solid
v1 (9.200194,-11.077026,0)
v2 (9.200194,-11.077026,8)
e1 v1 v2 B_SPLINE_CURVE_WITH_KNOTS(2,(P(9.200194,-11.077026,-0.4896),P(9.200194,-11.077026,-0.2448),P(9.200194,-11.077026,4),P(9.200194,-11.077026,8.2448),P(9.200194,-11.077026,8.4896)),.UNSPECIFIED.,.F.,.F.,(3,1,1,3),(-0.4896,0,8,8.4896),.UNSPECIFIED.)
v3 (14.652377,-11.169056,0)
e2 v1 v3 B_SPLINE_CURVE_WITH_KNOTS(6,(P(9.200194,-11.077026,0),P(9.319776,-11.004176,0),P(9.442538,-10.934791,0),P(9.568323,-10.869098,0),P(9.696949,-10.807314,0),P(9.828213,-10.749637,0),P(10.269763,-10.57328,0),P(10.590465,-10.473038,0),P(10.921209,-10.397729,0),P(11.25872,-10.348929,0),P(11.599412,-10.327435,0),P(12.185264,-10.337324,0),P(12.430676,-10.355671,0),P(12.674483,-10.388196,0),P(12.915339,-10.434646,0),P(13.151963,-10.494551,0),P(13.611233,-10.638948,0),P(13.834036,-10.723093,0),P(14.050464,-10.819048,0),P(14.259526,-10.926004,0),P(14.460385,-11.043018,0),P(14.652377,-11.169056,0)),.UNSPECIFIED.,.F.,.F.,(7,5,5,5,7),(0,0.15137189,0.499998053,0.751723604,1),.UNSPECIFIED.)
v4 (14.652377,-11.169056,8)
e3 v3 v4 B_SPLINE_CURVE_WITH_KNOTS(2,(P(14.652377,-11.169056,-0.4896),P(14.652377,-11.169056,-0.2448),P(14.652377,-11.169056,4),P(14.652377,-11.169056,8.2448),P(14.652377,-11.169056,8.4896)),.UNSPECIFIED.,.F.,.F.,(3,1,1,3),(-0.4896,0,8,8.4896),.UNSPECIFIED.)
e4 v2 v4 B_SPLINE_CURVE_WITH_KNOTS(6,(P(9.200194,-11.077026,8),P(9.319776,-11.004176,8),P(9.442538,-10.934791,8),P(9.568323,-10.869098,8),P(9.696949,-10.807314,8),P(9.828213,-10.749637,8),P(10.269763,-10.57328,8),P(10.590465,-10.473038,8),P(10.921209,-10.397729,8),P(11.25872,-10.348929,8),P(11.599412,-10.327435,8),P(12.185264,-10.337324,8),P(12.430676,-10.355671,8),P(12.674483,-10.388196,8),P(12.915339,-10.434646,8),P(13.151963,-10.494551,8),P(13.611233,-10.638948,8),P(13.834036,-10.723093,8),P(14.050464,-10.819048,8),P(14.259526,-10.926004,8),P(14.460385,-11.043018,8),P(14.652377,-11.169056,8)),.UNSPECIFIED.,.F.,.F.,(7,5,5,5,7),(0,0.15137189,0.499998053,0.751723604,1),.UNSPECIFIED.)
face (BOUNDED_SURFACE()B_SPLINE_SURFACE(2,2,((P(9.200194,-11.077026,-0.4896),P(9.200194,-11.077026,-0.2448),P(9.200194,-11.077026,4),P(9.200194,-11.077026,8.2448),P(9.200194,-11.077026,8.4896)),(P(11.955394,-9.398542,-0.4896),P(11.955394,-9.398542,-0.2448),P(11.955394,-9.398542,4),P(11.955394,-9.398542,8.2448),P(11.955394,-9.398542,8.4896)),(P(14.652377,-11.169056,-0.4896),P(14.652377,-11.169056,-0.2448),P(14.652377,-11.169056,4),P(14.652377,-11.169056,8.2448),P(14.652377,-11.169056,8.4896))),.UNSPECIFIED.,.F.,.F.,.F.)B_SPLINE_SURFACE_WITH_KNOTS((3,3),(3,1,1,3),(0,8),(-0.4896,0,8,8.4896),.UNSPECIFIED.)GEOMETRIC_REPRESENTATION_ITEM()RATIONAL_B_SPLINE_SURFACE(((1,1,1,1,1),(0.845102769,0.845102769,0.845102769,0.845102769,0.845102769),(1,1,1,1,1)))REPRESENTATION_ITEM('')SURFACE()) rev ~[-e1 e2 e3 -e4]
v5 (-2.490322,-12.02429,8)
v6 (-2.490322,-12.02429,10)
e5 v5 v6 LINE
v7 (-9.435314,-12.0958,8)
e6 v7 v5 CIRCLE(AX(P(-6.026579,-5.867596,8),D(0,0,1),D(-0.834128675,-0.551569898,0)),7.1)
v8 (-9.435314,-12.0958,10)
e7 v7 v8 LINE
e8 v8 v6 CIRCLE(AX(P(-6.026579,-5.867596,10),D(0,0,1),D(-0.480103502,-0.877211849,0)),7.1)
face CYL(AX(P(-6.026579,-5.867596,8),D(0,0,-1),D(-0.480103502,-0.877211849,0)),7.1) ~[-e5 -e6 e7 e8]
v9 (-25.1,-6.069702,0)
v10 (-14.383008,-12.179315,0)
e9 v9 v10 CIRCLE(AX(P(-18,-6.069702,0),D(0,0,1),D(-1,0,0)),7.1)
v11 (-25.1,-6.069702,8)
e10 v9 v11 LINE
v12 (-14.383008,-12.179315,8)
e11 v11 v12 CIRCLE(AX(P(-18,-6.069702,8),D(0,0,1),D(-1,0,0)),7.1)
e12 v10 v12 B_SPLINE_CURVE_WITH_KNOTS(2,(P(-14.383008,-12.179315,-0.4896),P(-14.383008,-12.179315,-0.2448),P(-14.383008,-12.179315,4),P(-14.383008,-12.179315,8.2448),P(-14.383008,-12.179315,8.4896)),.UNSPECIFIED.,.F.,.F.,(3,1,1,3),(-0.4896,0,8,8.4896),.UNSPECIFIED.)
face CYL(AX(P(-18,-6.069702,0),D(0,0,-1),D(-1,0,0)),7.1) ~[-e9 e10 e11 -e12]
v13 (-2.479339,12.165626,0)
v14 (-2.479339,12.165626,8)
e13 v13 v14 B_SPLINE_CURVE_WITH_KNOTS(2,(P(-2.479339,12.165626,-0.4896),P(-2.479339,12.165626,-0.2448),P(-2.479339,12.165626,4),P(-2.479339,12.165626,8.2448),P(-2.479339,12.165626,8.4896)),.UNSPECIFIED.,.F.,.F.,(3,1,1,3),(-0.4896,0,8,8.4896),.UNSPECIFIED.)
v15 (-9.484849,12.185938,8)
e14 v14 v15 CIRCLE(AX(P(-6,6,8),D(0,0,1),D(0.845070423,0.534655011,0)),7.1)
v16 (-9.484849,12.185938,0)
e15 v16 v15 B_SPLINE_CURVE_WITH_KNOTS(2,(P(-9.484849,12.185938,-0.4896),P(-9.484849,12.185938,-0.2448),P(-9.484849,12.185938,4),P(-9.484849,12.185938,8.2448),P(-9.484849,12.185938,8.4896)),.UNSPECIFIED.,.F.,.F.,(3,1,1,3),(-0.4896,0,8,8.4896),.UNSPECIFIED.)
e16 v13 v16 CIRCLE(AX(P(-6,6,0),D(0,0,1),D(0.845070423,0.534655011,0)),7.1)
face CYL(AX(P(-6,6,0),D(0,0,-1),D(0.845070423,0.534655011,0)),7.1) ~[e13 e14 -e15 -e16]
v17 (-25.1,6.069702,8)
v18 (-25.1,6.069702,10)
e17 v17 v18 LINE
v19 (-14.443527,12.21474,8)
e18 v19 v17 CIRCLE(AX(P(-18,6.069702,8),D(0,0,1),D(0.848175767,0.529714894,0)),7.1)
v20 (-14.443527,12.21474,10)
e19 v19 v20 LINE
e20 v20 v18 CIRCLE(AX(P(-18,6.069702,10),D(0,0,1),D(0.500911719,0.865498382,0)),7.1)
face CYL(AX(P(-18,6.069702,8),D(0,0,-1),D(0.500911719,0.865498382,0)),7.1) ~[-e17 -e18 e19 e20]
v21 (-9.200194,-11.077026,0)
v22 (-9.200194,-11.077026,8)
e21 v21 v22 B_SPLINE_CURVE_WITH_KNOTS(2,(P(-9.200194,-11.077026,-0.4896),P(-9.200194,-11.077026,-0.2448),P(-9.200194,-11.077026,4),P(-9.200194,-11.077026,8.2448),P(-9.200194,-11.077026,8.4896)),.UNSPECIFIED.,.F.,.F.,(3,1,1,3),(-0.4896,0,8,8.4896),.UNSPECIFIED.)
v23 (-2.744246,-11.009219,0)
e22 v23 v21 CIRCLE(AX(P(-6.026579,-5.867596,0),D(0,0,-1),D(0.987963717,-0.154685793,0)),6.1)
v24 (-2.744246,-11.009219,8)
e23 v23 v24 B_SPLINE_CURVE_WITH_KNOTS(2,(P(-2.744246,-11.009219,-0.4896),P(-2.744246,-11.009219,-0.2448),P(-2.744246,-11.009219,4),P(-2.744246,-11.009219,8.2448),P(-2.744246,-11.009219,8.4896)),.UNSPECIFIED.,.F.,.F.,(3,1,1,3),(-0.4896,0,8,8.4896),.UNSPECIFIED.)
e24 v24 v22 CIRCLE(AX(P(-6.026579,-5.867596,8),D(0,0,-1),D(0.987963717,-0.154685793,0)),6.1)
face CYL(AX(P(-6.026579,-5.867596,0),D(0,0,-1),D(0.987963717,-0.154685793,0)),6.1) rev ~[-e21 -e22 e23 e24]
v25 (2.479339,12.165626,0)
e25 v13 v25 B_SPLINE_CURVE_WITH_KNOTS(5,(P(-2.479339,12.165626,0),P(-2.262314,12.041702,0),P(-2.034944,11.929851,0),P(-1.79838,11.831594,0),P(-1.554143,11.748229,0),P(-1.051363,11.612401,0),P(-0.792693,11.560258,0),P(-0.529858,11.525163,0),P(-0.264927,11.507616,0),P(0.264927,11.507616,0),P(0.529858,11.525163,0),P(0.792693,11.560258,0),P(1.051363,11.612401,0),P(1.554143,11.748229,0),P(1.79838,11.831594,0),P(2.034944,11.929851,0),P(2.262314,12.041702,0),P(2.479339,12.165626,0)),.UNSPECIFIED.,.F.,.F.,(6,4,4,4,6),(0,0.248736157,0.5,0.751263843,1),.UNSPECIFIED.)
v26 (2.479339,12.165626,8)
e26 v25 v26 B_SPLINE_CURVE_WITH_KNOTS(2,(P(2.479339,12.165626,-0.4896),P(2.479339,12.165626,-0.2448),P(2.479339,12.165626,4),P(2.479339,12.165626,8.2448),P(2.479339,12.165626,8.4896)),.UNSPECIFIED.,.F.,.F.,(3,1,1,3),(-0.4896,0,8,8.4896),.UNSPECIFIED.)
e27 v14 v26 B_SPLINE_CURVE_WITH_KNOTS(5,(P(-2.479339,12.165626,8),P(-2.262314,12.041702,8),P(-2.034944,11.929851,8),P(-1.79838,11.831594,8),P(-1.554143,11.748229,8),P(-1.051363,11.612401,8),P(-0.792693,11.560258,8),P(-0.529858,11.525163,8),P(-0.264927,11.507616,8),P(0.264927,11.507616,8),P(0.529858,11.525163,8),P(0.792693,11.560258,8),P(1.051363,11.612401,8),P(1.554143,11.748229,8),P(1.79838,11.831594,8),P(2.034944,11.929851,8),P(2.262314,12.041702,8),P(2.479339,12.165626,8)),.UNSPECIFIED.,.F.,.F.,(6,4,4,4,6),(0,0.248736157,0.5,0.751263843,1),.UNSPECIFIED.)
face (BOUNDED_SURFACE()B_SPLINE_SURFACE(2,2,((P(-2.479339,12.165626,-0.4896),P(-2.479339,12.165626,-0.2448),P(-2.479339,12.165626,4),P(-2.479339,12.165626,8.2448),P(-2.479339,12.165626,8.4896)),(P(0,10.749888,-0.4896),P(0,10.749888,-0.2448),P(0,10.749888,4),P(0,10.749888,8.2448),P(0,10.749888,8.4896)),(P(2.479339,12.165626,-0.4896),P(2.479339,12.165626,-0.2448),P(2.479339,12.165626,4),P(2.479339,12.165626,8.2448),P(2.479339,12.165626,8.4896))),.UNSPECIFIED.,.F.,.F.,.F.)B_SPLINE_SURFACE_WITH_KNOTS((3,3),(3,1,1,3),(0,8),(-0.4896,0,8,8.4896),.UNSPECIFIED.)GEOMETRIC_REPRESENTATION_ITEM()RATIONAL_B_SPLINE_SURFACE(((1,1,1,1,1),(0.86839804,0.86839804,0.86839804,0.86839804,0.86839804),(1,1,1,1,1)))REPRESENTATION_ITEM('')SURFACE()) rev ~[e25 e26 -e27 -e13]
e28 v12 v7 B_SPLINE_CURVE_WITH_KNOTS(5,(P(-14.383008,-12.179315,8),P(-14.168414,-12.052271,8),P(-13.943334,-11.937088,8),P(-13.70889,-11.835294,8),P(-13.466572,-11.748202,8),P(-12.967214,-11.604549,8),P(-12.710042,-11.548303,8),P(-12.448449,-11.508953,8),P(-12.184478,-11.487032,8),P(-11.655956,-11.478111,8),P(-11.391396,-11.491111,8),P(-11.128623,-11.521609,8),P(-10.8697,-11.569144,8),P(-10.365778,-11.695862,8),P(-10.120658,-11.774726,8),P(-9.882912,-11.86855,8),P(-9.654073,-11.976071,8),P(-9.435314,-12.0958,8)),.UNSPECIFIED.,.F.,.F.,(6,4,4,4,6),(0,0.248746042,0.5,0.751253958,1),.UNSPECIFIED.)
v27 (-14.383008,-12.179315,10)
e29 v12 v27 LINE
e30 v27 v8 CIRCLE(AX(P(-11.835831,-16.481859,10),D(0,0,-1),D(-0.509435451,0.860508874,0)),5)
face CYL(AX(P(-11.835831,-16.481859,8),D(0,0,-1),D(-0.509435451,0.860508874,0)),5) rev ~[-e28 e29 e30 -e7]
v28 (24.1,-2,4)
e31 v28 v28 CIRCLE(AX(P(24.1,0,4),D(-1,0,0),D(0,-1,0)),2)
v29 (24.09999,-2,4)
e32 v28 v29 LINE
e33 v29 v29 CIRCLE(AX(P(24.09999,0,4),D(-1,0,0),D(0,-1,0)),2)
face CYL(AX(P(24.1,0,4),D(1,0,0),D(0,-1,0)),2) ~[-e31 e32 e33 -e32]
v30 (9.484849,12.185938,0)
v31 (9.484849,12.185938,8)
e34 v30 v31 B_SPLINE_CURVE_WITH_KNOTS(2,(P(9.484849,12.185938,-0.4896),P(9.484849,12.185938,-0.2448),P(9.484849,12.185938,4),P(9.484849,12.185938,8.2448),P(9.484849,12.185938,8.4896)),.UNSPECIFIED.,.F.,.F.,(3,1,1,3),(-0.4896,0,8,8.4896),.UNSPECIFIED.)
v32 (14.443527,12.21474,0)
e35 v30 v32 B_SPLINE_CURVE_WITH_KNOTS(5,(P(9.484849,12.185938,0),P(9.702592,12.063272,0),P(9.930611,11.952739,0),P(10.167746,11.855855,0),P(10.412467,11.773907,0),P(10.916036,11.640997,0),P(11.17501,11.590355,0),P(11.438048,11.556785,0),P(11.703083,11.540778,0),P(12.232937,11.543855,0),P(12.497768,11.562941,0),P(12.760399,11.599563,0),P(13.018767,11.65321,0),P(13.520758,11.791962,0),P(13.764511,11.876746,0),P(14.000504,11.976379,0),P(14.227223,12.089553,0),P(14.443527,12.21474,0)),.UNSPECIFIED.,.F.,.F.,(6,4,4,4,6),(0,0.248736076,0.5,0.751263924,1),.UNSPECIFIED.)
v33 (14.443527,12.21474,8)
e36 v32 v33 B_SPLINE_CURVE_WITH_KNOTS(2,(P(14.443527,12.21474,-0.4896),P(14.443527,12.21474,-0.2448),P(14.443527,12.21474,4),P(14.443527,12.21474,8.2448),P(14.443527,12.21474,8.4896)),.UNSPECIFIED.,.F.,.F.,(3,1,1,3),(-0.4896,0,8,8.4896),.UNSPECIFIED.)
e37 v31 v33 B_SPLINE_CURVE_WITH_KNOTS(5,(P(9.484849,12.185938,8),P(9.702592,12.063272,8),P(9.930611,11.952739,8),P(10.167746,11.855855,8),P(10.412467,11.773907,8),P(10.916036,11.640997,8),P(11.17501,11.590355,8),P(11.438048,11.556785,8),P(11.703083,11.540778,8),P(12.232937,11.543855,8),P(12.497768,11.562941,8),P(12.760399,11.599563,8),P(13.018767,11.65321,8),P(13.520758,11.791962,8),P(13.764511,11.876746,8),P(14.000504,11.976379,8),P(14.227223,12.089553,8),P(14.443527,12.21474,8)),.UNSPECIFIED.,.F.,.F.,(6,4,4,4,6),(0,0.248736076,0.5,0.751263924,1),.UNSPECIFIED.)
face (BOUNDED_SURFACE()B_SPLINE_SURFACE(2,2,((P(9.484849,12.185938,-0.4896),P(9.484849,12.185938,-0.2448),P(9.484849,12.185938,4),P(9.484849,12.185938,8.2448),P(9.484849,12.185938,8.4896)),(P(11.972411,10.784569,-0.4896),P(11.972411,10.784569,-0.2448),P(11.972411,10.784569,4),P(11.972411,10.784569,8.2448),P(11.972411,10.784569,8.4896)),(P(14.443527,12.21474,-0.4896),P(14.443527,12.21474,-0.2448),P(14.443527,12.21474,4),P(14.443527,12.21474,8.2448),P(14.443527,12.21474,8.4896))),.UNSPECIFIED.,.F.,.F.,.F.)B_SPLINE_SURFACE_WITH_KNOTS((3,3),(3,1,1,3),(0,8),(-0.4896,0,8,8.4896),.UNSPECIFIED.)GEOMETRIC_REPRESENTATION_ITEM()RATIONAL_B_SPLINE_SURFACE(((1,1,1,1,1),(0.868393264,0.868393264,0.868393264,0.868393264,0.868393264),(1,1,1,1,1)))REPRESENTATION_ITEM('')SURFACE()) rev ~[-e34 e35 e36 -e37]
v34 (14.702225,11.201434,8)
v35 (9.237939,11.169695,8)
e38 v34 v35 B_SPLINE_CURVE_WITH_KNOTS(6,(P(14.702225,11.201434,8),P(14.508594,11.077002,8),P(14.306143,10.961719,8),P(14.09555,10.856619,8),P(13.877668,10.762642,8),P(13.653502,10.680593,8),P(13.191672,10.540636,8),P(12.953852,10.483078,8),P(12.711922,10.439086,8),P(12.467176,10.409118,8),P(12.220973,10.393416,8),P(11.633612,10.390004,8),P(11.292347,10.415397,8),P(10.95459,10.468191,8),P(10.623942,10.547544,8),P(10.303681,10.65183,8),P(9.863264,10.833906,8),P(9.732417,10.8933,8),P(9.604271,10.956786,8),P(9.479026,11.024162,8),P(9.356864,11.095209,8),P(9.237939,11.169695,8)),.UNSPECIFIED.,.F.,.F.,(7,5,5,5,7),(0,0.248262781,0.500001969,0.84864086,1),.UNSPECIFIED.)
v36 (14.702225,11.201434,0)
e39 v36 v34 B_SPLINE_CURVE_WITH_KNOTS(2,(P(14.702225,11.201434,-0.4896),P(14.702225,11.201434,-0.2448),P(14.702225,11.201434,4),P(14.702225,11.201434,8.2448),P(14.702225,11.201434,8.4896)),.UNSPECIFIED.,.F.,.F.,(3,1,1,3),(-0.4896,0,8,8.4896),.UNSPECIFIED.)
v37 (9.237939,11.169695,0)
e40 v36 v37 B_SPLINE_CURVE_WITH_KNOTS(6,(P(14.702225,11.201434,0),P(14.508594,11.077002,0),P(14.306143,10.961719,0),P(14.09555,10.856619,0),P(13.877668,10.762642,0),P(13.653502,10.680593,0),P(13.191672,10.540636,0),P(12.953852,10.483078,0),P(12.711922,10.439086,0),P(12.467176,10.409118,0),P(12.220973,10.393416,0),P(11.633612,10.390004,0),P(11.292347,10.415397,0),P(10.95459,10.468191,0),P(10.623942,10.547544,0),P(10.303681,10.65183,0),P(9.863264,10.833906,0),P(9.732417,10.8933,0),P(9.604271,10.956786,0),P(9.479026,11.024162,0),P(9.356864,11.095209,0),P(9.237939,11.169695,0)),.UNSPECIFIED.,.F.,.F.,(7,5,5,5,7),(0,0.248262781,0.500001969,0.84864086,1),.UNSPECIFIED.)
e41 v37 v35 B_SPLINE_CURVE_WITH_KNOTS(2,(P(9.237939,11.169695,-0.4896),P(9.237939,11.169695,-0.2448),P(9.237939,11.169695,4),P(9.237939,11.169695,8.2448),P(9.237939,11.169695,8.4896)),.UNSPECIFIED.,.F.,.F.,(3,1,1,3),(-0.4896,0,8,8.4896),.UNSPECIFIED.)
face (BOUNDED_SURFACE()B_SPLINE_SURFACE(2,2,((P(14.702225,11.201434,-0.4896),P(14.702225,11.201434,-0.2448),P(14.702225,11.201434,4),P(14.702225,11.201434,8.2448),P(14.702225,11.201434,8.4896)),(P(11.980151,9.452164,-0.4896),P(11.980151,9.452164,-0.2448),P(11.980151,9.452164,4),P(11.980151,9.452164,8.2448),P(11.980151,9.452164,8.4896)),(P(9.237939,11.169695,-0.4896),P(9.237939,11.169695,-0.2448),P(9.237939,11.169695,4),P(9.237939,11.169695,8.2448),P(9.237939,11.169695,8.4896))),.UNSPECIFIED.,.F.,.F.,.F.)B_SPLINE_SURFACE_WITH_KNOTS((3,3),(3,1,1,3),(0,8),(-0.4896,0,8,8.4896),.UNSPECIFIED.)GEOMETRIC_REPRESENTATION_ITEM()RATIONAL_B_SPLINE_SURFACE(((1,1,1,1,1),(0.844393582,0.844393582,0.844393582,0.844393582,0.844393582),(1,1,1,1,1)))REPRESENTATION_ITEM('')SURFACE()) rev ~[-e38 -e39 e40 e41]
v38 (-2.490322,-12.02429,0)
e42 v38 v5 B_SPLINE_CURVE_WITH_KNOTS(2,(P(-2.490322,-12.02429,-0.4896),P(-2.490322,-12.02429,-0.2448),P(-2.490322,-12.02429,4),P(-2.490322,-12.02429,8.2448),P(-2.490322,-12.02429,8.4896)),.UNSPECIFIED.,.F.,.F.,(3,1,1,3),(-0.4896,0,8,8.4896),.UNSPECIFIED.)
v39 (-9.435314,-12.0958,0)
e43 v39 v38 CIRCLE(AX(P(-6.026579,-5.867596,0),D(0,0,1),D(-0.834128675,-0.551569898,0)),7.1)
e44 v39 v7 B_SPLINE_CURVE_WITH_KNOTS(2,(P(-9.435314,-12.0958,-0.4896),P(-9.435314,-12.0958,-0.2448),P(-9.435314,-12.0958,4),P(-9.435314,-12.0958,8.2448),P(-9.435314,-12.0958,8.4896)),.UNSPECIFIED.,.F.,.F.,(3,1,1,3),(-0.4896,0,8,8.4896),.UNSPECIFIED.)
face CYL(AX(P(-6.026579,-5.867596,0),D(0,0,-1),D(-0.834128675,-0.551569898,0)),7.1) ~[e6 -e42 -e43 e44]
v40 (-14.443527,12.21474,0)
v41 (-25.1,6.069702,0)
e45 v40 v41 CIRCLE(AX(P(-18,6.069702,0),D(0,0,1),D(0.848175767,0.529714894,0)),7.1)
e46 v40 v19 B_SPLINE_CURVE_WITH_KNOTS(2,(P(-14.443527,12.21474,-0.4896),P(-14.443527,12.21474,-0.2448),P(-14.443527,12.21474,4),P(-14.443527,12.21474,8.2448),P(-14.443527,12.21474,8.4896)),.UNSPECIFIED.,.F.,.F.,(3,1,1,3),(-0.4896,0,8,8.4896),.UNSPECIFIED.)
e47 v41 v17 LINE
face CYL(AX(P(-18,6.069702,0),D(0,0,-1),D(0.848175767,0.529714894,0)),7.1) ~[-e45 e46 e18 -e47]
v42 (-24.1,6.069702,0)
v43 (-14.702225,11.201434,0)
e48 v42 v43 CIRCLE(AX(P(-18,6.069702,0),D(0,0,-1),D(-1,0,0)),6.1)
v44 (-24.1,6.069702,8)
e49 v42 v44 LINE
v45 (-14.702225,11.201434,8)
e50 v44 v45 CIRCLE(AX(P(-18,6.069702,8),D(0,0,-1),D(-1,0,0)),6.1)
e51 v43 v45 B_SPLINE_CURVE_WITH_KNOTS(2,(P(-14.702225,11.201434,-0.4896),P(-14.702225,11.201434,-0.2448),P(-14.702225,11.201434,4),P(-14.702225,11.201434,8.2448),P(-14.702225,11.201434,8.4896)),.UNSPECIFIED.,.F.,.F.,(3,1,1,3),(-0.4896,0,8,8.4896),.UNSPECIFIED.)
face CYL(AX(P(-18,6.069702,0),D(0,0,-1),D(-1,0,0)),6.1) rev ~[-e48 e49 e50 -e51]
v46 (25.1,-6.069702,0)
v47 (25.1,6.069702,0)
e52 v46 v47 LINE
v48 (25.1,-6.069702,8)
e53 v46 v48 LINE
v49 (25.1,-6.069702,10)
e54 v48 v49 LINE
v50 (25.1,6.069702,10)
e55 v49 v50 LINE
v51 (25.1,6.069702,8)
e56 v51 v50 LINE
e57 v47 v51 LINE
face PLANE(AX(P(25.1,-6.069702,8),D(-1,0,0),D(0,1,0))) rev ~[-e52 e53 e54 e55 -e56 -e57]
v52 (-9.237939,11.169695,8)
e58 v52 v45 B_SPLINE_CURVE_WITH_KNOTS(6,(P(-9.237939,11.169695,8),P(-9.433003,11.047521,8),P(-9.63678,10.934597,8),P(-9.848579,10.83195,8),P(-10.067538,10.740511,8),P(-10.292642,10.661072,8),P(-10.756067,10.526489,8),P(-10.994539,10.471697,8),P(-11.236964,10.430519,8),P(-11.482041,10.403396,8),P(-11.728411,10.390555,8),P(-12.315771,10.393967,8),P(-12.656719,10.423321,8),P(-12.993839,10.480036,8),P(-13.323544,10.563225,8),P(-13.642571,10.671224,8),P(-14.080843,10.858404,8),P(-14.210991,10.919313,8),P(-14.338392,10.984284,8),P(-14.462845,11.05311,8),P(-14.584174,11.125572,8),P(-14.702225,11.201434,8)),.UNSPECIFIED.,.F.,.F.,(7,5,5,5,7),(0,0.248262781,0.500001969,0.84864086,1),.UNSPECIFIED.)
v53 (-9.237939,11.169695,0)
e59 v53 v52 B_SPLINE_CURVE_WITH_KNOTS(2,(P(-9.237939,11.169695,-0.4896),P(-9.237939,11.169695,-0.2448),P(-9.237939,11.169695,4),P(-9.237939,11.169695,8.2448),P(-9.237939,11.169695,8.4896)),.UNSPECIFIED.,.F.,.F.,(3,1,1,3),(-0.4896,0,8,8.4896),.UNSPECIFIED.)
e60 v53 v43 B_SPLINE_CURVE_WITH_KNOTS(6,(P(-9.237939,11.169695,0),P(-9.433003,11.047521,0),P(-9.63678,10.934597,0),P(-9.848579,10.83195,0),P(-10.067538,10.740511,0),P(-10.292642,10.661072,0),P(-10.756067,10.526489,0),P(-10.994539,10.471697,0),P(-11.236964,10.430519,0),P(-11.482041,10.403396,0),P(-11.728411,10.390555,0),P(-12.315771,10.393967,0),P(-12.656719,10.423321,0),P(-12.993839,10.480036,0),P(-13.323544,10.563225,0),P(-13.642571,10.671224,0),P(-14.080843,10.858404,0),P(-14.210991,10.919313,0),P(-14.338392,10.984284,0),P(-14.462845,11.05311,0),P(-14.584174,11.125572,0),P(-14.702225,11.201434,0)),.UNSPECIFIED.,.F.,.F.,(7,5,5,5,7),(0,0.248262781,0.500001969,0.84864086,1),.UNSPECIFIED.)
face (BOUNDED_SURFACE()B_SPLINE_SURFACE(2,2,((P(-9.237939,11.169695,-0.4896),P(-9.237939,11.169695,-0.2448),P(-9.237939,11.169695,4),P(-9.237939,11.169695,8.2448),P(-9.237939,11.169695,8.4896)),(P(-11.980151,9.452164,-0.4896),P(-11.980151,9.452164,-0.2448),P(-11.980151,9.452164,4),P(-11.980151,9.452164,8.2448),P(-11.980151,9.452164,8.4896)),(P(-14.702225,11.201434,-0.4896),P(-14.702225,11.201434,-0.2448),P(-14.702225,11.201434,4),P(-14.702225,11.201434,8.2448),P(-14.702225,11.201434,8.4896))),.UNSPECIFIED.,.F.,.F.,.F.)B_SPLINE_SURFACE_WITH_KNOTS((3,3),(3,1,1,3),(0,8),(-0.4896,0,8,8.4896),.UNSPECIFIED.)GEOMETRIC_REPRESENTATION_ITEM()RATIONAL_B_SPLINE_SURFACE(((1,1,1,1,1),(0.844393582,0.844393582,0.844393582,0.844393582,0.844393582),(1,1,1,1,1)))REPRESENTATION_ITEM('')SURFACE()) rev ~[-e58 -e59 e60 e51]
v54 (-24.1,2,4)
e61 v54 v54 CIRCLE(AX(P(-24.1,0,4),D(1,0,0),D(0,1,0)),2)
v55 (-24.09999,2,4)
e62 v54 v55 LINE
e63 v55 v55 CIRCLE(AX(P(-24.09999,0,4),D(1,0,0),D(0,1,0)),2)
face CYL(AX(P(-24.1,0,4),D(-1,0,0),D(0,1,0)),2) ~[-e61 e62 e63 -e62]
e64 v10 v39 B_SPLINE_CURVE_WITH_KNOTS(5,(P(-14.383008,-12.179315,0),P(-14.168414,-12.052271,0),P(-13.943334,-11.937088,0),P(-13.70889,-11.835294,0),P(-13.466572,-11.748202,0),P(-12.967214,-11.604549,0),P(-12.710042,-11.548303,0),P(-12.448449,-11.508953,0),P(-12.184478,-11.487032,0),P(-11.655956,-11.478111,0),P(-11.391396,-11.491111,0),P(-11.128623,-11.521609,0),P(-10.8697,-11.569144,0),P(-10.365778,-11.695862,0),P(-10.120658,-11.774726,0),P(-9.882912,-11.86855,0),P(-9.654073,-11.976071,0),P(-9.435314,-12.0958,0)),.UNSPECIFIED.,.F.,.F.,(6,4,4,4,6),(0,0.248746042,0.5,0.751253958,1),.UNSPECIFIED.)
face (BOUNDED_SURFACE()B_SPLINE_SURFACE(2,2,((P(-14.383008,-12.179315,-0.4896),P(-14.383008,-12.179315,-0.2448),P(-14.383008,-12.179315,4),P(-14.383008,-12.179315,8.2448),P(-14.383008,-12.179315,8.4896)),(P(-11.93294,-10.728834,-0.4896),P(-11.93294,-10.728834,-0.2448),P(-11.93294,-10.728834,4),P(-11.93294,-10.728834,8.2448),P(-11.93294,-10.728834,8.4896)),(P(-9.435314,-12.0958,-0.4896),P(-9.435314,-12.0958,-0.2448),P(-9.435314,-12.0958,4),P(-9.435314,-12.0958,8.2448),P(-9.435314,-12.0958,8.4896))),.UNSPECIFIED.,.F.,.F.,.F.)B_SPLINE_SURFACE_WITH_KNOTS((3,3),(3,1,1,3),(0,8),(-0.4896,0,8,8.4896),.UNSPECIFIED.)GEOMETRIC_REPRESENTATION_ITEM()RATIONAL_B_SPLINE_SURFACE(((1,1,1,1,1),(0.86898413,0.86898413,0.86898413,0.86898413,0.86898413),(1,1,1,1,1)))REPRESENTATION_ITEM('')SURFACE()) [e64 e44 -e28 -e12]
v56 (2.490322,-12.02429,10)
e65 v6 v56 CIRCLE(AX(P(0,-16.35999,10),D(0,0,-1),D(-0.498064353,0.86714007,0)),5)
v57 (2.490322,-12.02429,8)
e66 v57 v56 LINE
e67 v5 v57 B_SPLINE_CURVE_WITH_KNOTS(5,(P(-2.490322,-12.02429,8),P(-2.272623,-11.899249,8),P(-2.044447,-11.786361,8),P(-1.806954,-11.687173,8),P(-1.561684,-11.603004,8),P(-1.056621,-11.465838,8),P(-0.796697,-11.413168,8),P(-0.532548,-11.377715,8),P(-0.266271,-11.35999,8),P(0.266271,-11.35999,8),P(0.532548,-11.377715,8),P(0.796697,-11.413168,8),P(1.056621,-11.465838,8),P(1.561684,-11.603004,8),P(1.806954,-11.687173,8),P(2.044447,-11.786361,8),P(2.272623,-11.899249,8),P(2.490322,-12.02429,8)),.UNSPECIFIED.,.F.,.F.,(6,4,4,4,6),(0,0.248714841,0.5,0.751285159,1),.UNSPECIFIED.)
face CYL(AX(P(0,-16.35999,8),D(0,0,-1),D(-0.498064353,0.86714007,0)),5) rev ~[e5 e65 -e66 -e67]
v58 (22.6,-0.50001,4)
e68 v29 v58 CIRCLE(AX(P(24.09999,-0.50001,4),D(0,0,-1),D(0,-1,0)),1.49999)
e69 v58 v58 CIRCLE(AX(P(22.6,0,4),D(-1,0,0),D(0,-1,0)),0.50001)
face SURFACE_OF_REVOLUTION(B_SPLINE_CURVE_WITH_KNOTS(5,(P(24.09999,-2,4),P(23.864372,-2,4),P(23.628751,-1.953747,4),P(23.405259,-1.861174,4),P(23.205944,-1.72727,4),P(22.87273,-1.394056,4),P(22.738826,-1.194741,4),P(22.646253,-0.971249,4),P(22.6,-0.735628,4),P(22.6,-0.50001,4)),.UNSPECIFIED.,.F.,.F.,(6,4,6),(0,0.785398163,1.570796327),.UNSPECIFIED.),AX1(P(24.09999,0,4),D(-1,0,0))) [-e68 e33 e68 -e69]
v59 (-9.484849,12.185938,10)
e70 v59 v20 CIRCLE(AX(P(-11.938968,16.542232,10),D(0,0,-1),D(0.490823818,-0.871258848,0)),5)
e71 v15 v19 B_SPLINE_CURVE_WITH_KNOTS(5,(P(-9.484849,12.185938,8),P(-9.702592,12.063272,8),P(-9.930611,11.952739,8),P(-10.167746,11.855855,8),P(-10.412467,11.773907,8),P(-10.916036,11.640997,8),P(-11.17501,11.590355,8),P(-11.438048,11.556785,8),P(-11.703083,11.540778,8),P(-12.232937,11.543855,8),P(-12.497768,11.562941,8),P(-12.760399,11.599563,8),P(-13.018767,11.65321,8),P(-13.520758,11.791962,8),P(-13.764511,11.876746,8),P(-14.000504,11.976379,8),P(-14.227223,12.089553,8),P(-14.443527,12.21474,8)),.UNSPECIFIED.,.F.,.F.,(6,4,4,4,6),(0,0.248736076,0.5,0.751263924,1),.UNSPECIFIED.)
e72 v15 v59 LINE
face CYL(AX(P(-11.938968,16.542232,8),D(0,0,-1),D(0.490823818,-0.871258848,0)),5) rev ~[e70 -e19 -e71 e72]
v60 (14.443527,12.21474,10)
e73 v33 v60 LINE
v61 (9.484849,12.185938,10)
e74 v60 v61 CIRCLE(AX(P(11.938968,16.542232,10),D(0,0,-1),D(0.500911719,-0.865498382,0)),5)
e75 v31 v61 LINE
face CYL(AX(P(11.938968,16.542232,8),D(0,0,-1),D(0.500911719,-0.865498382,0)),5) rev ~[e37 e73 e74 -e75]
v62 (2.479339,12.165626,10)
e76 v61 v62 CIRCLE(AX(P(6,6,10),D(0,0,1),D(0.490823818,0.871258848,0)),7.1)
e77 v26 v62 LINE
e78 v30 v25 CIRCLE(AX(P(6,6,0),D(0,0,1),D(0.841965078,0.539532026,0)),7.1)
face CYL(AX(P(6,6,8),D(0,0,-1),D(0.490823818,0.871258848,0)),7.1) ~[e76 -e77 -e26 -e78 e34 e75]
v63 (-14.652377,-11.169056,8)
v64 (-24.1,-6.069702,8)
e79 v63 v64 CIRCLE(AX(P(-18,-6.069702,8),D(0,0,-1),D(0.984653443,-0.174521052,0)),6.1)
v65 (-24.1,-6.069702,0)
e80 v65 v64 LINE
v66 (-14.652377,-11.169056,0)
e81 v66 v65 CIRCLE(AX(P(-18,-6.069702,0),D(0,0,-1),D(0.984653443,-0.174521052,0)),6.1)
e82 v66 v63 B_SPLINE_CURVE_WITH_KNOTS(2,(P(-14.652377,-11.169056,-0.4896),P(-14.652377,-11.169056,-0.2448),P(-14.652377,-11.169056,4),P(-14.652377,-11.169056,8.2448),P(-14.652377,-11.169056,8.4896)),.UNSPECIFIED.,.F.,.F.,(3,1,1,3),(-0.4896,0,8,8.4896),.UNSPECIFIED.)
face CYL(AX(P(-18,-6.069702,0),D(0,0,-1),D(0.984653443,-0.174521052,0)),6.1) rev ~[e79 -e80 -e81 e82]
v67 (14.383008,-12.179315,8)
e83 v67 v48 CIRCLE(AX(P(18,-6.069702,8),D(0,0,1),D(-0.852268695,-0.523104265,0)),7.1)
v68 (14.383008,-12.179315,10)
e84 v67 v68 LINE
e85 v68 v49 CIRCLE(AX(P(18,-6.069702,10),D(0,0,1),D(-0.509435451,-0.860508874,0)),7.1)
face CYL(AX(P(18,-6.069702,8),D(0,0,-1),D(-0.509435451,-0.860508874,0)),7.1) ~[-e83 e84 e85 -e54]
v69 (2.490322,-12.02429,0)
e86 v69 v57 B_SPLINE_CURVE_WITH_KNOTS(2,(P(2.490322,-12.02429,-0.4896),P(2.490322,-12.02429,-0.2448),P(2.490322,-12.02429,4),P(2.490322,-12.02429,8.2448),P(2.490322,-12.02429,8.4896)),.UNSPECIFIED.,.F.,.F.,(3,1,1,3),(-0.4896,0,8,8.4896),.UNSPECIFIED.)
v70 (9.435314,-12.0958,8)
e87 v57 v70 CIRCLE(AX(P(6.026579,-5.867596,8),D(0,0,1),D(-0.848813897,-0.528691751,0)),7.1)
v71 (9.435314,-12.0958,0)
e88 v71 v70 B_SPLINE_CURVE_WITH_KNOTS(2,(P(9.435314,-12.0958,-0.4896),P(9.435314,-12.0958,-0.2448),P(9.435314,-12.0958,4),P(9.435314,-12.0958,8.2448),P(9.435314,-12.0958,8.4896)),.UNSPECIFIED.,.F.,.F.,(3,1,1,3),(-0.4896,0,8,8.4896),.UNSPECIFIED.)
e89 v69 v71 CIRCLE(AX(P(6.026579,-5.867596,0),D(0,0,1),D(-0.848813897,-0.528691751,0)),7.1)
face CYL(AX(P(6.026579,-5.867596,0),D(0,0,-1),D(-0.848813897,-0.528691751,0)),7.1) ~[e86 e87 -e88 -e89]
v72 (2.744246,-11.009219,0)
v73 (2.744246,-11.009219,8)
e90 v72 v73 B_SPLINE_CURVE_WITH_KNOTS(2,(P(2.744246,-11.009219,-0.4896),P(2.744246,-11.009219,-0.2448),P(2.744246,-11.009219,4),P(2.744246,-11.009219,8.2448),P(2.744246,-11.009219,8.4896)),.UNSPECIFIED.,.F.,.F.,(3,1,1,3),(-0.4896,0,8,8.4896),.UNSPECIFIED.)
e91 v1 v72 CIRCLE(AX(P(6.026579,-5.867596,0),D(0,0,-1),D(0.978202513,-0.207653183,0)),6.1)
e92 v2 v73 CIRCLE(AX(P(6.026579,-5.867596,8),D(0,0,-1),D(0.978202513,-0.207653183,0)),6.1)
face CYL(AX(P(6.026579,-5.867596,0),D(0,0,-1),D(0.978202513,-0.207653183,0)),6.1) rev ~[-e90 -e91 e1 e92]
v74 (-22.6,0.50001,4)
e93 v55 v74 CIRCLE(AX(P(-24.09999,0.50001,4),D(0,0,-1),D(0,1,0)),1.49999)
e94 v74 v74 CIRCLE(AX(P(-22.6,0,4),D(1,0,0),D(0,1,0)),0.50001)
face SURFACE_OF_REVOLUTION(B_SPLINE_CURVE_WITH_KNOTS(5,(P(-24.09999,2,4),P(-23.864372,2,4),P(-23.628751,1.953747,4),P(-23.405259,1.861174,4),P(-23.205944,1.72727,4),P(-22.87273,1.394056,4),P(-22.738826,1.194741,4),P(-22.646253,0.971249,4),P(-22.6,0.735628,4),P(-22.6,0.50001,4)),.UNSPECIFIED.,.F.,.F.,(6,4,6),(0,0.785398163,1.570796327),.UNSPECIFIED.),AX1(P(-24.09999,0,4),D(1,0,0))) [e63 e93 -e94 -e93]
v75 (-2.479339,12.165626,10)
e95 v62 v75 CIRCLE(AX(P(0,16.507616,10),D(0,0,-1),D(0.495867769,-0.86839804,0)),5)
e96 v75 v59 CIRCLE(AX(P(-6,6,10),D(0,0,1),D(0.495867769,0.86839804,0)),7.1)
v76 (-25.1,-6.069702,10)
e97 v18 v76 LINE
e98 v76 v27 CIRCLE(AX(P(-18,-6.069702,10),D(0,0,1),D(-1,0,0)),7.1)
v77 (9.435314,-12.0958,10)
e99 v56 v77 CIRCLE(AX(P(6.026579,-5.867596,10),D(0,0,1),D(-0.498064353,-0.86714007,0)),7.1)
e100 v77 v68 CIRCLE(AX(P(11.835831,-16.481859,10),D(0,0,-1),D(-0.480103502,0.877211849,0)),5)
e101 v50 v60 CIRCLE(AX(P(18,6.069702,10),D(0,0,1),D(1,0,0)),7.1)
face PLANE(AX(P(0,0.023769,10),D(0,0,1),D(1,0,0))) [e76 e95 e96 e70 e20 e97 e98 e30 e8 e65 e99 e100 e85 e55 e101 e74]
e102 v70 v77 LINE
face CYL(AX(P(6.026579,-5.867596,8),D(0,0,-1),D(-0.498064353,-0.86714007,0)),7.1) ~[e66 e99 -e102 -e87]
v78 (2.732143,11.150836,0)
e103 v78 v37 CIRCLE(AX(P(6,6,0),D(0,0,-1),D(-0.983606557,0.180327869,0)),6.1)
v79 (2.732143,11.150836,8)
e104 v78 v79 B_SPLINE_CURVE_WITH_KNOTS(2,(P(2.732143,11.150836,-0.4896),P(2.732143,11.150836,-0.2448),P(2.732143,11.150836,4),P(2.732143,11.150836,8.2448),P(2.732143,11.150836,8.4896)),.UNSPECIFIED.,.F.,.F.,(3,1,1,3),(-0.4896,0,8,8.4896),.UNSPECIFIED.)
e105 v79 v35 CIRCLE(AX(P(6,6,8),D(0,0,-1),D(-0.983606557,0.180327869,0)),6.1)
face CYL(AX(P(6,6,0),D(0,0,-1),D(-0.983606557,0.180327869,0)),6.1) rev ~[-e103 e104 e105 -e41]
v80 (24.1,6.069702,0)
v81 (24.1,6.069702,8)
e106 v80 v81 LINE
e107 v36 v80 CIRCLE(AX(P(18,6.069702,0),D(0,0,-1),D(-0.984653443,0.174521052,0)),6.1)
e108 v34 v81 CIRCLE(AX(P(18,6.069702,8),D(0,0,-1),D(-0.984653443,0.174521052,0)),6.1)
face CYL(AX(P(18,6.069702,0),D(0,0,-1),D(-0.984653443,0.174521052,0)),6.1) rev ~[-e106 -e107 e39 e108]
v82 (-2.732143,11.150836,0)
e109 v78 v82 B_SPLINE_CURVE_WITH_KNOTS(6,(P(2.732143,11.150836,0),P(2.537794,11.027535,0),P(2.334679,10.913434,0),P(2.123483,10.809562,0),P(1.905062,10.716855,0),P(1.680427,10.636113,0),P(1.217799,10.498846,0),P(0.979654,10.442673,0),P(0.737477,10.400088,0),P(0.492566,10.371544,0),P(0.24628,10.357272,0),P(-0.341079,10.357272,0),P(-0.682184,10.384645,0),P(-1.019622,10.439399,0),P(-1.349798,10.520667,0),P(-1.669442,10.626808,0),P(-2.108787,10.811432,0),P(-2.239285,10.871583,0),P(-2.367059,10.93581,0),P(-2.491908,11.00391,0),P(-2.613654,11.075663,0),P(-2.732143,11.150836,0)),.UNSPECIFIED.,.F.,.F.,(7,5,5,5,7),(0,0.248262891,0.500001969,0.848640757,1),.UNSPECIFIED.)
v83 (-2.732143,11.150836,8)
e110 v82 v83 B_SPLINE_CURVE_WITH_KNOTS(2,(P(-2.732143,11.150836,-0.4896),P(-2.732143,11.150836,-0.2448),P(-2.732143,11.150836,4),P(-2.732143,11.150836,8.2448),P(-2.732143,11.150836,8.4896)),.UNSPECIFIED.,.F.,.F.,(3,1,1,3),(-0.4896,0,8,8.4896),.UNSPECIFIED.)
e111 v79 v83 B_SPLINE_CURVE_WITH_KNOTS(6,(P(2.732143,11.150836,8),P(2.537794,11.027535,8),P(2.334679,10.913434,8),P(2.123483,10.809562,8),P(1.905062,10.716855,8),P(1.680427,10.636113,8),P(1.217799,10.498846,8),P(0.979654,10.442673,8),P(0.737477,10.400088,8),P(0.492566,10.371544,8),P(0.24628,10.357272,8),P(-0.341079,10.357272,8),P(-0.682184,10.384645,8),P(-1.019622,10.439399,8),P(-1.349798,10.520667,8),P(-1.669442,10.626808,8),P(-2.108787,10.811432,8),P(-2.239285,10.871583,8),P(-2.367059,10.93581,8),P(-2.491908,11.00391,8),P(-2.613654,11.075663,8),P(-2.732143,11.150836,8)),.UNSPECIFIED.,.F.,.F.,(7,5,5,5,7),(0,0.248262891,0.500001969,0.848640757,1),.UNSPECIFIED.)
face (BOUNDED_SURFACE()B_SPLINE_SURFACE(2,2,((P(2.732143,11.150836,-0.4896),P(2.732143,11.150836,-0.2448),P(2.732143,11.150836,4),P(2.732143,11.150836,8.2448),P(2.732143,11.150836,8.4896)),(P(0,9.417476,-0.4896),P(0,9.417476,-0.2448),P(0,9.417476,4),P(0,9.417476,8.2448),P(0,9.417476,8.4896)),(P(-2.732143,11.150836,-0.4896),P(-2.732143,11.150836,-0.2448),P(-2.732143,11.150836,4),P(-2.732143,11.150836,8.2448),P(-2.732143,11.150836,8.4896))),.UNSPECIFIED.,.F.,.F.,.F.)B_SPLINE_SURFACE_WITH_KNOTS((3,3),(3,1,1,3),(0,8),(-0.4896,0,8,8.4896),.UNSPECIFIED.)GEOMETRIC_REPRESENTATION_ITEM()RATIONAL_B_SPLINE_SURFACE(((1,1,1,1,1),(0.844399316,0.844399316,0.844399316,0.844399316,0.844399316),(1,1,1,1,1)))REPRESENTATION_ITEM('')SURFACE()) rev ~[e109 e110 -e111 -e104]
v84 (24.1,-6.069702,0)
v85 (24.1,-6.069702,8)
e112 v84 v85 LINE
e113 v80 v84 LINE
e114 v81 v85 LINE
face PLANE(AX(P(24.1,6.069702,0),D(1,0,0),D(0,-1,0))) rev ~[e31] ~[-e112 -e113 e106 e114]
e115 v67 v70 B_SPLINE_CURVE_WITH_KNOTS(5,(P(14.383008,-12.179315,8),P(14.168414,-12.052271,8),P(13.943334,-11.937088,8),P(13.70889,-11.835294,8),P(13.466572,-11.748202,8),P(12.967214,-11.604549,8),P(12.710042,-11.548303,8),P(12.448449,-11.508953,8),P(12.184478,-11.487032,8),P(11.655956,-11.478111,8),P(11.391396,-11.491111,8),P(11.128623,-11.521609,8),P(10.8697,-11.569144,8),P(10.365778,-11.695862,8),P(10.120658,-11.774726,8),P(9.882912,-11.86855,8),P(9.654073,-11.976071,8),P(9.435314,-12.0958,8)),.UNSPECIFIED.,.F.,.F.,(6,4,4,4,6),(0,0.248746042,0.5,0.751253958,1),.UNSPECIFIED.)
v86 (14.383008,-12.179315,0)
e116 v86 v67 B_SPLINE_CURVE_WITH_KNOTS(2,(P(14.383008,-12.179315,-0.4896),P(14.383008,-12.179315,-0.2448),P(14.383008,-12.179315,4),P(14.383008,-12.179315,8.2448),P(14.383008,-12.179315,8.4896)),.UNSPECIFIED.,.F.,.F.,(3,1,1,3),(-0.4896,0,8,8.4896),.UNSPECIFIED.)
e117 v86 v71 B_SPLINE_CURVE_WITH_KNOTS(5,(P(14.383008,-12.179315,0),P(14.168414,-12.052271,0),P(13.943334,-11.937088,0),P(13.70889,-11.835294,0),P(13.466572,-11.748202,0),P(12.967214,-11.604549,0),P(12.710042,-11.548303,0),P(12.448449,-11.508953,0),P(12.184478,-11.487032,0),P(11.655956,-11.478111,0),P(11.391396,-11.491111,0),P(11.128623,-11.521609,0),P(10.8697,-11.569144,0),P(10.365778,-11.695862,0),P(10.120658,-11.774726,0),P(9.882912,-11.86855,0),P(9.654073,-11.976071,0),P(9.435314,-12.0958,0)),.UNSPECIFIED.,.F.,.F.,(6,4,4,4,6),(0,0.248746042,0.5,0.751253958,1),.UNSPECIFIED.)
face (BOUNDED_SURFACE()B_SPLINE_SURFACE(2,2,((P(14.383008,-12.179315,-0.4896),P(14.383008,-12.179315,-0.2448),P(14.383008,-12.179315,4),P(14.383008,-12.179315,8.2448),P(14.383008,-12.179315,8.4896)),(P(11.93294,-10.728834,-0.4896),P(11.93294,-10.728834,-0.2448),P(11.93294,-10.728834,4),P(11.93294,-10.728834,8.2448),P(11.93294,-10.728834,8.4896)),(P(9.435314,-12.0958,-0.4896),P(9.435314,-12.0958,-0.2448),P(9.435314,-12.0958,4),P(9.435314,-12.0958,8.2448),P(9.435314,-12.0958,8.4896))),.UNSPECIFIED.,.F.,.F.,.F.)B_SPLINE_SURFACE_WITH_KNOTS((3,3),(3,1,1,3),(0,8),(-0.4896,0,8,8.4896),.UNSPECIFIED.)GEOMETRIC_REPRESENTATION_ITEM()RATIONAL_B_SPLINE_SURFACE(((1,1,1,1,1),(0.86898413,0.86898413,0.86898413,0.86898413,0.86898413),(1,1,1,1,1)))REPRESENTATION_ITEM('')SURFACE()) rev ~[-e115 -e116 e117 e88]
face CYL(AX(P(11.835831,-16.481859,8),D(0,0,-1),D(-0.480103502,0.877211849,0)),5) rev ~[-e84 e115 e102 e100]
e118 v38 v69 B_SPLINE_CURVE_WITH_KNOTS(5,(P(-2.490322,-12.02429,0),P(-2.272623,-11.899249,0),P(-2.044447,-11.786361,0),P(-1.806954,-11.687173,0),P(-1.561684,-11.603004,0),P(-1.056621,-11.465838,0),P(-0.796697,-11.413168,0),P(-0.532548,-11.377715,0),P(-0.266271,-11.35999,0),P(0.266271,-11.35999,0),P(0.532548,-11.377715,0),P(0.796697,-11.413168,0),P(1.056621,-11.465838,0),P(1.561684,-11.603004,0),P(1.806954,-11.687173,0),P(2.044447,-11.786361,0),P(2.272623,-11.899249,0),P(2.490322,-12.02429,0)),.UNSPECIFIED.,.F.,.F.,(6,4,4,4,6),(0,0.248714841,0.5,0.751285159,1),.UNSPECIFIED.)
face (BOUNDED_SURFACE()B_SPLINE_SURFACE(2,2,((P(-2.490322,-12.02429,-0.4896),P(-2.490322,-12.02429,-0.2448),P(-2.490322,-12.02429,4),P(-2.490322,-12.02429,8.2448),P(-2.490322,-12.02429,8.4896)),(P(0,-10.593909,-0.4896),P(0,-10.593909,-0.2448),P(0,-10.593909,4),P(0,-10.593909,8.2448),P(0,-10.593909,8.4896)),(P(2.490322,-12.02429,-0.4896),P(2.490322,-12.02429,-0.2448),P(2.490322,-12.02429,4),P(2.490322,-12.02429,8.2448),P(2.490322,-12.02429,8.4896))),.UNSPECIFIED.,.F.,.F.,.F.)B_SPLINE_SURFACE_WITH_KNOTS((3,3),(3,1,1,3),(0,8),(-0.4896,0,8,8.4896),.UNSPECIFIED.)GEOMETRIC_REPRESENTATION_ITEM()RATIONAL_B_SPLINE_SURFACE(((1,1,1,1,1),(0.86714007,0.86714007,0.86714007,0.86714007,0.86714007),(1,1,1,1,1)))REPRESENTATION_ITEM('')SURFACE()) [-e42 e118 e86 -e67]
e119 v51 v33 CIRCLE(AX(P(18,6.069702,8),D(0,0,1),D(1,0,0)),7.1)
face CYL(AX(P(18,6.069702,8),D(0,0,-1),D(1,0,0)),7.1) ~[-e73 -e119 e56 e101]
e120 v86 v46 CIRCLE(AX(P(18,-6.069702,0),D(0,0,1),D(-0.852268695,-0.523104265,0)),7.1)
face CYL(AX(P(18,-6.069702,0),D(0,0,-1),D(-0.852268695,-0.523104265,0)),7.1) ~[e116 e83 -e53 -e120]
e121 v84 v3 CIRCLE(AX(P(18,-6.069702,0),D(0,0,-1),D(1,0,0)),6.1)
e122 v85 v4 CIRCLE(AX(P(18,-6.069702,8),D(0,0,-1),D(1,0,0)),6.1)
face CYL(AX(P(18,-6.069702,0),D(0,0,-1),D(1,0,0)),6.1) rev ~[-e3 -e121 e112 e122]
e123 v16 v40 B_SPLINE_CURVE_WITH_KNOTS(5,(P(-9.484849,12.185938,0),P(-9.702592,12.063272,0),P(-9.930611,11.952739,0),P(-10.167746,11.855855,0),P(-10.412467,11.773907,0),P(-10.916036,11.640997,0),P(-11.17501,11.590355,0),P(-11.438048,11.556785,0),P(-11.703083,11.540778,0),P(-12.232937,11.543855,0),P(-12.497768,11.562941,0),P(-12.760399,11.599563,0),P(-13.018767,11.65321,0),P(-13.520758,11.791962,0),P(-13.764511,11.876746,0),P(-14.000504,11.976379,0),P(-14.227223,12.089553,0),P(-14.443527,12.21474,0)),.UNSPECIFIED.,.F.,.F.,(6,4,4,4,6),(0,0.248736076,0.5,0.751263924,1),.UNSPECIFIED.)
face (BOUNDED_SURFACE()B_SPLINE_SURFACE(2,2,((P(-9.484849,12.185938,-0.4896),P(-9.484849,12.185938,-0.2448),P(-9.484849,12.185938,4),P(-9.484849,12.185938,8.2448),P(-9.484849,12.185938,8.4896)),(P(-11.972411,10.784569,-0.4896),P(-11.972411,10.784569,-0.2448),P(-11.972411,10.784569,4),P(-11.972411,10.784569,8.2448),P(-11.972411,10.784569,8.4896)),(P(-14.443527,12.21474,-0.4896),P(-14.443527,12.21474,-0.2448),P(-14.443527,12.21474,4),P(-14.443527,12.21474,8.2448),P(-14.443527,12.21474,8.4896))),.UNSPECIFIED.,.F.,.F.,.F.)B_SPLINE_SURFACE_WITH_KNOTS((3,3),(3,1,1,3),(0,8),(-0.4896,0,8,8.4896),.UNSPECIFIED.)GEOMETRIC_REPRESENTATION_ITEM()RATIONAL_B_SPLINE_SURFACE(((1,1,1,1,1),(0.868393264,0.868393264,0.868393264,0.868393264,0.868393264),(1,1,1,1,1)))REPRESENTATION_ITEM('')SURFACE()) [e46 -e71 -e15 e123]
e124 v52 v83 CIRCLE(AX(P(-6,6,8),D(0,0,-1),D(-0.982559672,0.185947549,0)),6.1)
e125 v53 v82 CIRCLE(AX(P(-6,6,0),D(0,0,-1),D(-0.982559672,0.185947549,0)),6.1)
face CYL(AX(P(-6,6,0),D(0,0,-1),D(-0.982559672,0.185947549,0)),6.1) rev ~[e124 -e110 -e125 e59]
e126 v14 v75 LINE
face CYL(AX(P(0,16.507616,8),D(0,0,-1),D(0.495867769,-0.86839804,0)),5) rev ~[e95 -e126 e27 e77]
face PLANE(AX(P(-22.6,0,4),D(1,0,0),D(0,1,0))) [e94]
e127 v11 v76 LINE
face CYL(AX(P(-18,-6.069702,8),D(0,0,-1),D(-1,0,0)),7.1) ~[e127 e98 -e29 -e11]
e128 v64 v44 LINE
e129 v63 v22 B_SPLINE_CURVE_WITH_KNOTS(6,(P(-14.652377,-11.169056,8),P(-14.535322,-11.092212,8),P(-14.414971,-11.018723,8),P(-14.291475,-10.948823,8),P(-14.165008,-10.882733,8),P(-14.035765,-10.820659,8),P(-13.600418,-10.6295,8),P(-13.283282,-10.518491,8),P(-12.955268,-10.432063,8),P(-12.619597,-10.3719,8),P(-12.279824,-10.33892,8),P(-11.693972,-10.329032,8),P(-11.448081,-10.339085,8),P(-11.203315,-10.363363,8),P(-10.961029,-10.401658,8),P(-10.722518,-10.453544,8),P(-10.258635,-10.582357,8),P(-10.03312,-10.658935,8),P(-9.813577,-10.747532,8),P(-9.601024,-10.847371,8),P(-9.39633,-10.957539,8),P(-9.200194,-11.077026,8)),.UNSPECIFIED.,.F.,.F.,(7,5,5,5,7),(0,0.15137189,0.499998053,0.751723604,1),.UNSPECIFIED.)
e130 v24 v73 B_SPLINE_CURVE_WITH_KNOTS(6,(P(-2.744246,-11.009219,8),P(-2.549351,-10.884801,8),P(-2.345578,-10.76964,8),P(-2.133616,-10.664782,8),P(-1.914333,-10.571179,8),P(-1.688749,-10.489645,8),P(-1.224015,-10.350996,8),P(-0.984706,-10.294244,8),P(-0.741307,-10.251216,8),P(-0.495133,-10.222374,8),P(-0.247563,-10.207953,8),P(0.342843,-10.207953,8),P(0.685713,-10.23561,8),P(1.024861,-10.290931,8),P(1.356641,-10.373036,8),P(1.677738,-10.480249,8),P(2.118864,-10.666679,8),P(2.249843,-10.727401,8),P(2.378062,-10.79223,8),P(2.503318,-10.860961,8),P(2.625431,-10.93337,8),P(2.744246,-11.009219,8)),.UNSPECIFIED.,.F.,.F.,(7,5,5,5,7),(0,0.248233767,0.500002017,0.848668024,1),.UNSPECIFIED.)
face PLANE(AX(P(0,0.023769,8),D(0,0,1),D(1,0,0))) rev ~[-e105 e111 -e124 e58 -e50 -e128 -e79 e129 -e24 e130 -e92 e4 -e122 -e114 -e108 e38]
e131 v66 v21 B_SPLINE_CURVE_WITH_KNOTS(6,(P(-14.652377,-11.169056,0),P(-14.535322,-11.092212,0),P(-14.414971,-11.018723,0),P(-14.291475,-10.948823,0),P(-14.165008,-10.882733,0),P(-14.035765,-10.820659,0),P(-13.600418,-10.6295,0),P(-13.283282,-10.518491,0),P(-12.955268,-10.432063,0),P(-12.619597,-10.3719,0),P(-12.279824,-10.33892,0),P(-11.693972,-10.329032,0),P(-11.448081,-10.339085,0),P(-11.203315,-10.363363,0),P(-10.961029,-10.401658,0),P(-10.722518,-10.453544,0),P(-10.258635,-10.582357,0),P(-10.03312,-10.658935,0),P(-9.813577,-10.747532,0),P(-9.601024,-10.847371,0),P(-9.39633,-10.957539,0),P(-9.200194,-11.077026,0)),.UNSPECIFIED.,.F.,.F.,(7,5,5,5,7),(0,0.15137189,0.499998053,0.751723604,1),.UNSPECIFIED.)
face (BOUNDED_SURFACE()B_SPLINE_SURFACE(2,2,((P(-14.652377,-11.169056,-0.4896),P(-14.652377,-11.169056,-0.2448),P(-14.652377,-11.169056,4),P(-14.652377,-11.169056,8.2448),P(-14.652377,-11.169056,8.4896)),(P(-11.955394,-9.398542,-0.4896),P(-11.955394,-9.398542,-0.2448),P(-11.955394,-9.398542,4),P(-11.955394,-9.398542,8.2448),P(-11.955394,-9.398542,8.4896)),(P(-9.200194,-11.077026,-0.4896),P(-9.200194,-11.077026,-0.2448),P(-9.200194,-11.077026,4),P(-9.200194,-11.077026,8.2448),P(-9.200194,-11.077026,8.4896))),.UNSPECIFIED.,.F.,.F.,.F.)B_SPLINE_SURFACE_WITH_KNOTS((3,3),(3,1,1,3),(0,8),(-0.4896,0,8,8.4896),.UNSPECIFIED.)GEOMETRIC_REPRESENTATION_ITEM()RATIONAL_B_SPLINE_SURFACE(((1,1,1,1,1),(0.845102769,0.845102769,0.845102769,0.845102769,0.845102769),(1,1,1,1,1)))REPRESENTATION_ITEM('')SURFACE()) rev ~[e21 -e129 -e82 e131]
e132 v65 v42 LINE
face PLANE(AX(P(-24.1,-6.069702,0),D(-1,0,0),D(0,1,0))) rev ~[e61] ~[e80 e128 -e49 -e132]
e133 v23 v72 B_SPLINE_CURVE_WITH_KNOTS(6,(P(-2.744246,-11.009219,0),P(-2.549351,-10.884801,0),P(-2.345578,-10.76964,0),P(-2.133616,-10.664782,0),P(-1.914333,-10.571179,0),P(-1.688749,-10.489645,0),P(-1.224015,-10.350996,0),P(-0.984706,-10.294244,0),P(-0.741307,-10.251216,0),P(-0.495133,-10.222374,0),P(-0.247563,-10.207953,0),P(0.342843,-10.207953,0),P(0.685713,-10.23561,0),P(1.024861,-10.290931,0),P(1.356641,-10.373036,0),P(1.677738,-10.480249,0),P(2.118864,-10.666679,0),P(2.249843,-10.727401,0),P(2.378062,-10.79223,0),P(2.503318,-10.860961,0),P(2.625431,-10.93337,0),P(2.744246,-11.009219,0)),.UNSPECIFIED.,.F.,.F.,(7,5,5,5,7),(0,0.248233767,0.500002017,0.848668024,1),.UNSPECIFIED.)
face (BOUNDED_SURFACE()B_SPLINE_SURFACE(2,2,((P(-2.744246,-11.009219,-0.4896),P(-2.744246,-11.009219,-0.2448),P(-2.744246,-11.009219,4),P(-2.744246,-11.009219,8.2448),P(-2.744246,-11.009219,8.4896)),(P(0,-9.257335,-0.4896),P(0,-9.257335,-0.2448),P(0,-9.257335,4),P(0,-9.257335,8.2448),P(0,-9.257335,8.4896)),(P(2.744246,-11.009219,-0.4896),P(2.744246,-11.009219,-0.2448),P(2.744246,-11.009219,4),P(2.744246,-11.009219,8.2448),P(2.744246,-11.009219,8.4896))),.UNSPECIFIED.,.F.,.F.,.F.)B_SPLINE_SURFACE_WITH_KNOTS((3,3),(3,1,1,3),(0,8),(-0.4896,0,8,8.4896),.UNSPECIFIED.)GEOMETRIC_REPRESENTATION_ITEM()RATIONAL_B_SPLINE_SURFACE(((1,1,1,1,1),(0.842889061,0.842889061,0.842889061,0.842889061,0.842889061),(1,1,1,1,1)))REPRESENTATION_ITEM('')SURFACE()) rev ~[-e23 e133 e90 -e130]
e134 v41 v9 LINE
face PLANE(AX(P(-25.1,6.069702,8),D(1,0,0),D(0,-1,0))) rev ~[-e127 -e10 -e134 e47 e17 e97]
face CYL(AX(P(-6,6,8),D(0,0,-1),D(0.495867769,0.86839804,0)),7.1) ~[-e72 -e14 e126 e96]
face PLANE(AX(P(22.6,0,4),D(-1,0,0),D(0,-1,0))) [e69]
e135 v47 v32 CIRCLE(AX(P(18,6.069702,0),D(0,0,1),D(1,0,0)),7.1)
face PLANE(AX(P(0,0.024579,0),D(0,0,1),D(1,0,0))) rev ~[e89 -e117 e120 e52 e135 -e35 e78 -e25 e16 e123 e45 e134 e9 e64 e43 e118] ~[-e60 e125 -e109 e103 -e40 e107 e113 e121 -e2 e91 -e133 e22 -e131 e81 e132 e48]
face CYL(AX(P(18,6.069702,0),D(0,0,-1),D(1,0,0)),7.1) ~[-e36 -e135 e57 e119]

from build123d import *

# Parameters (mm, degrees)
F1_DEPTH  = 8
F2_R      = 5
F3_R      = 5.1
F5_DEPTH  = 2
F6_R      = 2
F7_DEPTH  = 1.5
F8_R      = 1.49999
F9_R      = 2
F10_DEPTH = 1.5
F11_R     = 1.49999


# Not quite as in the source:
# - a fillet or chamfer is up to 0.001 mm smaller than in the source, because OpenCascade refuses the exact size


with BuildPart() as f1:
    # F0 (on Top) → F1 (new body)
    with BuildSketch(Plane.XY):
        with BuildLine():
            ThreePointArc((0, 9.7960505792), (-5.9794748492, 13.0999703322), (-11.9779520569, 9.830677382))
            ThreePointArc((-11.9779520569, 9.830677382), (-19.9562029041, 12.8948954194), (-25.1, 6.0697016347))
            Line((-25.1, 6.0697016347), (-25.1, -6.0697016347))
            ThreePointArc((-25.1, -6.0697016347), (-19.9296547743, -12.9024486996), (-11.9488922671, -9.7837419151))
            ThreePointArc((-11.9488922671, -9.7837419151), (-5.9300692346, -12.9669396851), (0, -9.6213070677))
            ThreePointArc((0, -9.6213070677), (5.9300692346, -12.9669396851), (11.9488922671, -9.7837419151))
            ThreePointArc((11.9488922671, -9.7837419151), (19.9296547743, -12.9024486996), (25.1, -6.0697016347))
            Line((25.1, -6.0697016347), (25.1, 6.0697016347))
            ThreePointArc((25.1, 6.0697016347), (19.9562029041, 12.8948954194), (11.9779520569, 9.830677382))
            ThreePointArc((11.9779520569, 9.830677382), (5.9794748492, 13.0999703322), (0, 9.7960505792))
        make_face()
        with BuildLine():
            ThreePointArc((-24.1, 6.0697016347), (-18.5343432382, 12.1462530666), (-11.9936139988, 7.1342800509))
            ThreePointArc((-11.9936139988, 7.1342800509), (-5.9825651004, 12.0999750839), (0, 7.1))
            ThreePointArc((0, 7.1), (5.9825651004, 12.0999750839), (11.9936139988, 7.1342800509))
            ThreePointArc((11.9936139988, 7.1342800509), (18.5343432382, 12.1462530666), (24.1, 6.0697016347))
            Line((24.1, 6.0697016347), (24.1, -6.0697016347))
            ThreePointArc((24.1, -6.0697016347), (18.5343432382, -12.1462530666), (11.9936139988, -7.1342800509))
            ThreePointArc((11.9936139988, -7.1342800509), (5.8623077698, -11.9653833554), (0, -6.8111789722))
            ThreePointArc((0, -6.8111789722), (-5.8623077698, -11.9653833554), (-11.9936139988, -7.1342800509))
            ThreePointArc((-11.9936139988, -7.1342800509), (-18.5343432382, -12.1462530666), (-24.1, -6.0697016347))
            Line((-24.1, -6.0697016347), (-24.1, 6.0697016347))
        make_face(mode=Mode.SUBTRACT)
    extrude(amount=F1_DEPTH)

    # F2
    f2_edges = [f1.edges().sort_by_distance(p)[0] for p in [
        (-11.948892, -9.783742, 4),
        (0, -9.621307, 4),
        (11.948892, -9.783742, 4),
        (-11.977952, 9.830677, 4),
        (0, 9.796051, 4),
        (11.977952, 9.830677, 4),
    ]]
    fillet(f2_edges, radius=F2_R)

    # F3
    f3_edges = [f1.edges().sort_by_distance(p)[0] for p in [
        (-11.993614, -7.13428, 4),
        (0, -6.811179, 4),
        (11.993614, -7.13428, 4),
        (11.993614, 7.13428, 4),
        (0, 7.1, 4),
        (-11.993614, 7.13428, 4),
    ]]
    fillet(f3_edges, radius=F3_R)

    # F4 (on face) → F5 (join)
    with BuildSketch(Plane.XY.offset(8)):
        with BuildLine():
            ThreePointArc((-9.4848491067, 12.1859378193), (-11.9680100538, 11.5423164018), (-14.4435267926, 12.2147401477))
            ThreePointArc((-14.4435267926, 12.2147401477), (-21.5467619195, 12.2203503717), (-25.1, 6.0697016347))
            Line((-25.1, 6.0697016347), (-25.1, -6.0697016347))
            ThreePointArc((-25.1, -6.0697016347), (-21.5163446166, -12.2377905233), (-14.3830082993, -12.179314637))
            ThreePointArc((-14.3830082993, -12.179314637), (-11.9202167891, -11.4825711508), (-9.4353135356, -12.0957997614))
            ThreePointArc((-9.4353135356, -12.0957997614), (-5.9534768613, -12.9672192968), (-2.4903217652, -12.0242901298))
            ThreePointArc((-2.4903217652, -12.0242901298), (0, -11.3599904776), (2.4903217652, -12.0242901298))
            ThreePointArc((2.4903217652, -12.0242901298), (5.9534768613, -12.9672192968), (9.4353135356, -12.0957997614))
            ThreePointArc((9.4353135356, -12.0957997614), (11.9202167891, -11.4825711508), (14.3830082993, -12.179314637))
            ThreePointArc((14.3830082993, -12.179314637), (21.5163446166, -12.2377905233), (25.1, -6.0697016347))
            Line((25.1, -6.0697016347), (25.1, 6.0697016347))
            ThreePointArc((25.1, 6.0697016347), (21.5467619195, 12.2203503717), (14.4435267926, 12.2147401477))
            ThreePointArc((14.4435267926, 12.2147401477), (11.9680100538, 11.5423164018), (9.4848491067, 12.1859378193))
            ThreePointArc((9.4848491067, 12.1859378193), (5.9794143891, 13.0999701572), (2.479338843, 12.1656260848))
            ThreePointArc((2.479338843, 12.1656260848), (0, 11.5076162853), (-2.479338843, 12.1656260848))
            ThreePointArc((-2.479338843, 12.1656260848), (-5.9794143891, 13.0999701572), (-9.4848491067, 12.1859378193))
        make_face()
    extrude(amount=F5_DEPTH)

    # F6 (on face) → F7 (join)
    with BuildSketch(Plane.YZ.offset(-24.1)):
        with Locations((0, 4)):
            Circle(F6_R)
    extrude(amount=F7_DEPTH)

    # F8 (radius 1.5 in the source; OpenCascade refuses exactly that, so slightly less here)
    f8_edges = [f1.edges().sort_by_distance(p)[0] for p in [
        (-22.6, -2, 4),
    ]]
    fillet(f8_edges, radius=F8_R)

    # F9 (on face) → F10 (join)
    with BuildSketch(Plane(origin=(24.1, 0, 0), x_dir=(0, -1, 0), z_dir=(-1, 0, 0))):
        with Locations((0, 4)):
            Circle(F9_R)
    extrude(amount=F10_DEPTH)

    # F11 (radius 1.5 in the source; OpenCascade refuses exactly that, so slightly less here)
    f11_edges = [f1.edges().sort_by_distance(p)[0] for p in [
        (22.6, 2, 4),
    ]]
    fillet(f11_edges, radius=F11_R)


solid = f1.part
